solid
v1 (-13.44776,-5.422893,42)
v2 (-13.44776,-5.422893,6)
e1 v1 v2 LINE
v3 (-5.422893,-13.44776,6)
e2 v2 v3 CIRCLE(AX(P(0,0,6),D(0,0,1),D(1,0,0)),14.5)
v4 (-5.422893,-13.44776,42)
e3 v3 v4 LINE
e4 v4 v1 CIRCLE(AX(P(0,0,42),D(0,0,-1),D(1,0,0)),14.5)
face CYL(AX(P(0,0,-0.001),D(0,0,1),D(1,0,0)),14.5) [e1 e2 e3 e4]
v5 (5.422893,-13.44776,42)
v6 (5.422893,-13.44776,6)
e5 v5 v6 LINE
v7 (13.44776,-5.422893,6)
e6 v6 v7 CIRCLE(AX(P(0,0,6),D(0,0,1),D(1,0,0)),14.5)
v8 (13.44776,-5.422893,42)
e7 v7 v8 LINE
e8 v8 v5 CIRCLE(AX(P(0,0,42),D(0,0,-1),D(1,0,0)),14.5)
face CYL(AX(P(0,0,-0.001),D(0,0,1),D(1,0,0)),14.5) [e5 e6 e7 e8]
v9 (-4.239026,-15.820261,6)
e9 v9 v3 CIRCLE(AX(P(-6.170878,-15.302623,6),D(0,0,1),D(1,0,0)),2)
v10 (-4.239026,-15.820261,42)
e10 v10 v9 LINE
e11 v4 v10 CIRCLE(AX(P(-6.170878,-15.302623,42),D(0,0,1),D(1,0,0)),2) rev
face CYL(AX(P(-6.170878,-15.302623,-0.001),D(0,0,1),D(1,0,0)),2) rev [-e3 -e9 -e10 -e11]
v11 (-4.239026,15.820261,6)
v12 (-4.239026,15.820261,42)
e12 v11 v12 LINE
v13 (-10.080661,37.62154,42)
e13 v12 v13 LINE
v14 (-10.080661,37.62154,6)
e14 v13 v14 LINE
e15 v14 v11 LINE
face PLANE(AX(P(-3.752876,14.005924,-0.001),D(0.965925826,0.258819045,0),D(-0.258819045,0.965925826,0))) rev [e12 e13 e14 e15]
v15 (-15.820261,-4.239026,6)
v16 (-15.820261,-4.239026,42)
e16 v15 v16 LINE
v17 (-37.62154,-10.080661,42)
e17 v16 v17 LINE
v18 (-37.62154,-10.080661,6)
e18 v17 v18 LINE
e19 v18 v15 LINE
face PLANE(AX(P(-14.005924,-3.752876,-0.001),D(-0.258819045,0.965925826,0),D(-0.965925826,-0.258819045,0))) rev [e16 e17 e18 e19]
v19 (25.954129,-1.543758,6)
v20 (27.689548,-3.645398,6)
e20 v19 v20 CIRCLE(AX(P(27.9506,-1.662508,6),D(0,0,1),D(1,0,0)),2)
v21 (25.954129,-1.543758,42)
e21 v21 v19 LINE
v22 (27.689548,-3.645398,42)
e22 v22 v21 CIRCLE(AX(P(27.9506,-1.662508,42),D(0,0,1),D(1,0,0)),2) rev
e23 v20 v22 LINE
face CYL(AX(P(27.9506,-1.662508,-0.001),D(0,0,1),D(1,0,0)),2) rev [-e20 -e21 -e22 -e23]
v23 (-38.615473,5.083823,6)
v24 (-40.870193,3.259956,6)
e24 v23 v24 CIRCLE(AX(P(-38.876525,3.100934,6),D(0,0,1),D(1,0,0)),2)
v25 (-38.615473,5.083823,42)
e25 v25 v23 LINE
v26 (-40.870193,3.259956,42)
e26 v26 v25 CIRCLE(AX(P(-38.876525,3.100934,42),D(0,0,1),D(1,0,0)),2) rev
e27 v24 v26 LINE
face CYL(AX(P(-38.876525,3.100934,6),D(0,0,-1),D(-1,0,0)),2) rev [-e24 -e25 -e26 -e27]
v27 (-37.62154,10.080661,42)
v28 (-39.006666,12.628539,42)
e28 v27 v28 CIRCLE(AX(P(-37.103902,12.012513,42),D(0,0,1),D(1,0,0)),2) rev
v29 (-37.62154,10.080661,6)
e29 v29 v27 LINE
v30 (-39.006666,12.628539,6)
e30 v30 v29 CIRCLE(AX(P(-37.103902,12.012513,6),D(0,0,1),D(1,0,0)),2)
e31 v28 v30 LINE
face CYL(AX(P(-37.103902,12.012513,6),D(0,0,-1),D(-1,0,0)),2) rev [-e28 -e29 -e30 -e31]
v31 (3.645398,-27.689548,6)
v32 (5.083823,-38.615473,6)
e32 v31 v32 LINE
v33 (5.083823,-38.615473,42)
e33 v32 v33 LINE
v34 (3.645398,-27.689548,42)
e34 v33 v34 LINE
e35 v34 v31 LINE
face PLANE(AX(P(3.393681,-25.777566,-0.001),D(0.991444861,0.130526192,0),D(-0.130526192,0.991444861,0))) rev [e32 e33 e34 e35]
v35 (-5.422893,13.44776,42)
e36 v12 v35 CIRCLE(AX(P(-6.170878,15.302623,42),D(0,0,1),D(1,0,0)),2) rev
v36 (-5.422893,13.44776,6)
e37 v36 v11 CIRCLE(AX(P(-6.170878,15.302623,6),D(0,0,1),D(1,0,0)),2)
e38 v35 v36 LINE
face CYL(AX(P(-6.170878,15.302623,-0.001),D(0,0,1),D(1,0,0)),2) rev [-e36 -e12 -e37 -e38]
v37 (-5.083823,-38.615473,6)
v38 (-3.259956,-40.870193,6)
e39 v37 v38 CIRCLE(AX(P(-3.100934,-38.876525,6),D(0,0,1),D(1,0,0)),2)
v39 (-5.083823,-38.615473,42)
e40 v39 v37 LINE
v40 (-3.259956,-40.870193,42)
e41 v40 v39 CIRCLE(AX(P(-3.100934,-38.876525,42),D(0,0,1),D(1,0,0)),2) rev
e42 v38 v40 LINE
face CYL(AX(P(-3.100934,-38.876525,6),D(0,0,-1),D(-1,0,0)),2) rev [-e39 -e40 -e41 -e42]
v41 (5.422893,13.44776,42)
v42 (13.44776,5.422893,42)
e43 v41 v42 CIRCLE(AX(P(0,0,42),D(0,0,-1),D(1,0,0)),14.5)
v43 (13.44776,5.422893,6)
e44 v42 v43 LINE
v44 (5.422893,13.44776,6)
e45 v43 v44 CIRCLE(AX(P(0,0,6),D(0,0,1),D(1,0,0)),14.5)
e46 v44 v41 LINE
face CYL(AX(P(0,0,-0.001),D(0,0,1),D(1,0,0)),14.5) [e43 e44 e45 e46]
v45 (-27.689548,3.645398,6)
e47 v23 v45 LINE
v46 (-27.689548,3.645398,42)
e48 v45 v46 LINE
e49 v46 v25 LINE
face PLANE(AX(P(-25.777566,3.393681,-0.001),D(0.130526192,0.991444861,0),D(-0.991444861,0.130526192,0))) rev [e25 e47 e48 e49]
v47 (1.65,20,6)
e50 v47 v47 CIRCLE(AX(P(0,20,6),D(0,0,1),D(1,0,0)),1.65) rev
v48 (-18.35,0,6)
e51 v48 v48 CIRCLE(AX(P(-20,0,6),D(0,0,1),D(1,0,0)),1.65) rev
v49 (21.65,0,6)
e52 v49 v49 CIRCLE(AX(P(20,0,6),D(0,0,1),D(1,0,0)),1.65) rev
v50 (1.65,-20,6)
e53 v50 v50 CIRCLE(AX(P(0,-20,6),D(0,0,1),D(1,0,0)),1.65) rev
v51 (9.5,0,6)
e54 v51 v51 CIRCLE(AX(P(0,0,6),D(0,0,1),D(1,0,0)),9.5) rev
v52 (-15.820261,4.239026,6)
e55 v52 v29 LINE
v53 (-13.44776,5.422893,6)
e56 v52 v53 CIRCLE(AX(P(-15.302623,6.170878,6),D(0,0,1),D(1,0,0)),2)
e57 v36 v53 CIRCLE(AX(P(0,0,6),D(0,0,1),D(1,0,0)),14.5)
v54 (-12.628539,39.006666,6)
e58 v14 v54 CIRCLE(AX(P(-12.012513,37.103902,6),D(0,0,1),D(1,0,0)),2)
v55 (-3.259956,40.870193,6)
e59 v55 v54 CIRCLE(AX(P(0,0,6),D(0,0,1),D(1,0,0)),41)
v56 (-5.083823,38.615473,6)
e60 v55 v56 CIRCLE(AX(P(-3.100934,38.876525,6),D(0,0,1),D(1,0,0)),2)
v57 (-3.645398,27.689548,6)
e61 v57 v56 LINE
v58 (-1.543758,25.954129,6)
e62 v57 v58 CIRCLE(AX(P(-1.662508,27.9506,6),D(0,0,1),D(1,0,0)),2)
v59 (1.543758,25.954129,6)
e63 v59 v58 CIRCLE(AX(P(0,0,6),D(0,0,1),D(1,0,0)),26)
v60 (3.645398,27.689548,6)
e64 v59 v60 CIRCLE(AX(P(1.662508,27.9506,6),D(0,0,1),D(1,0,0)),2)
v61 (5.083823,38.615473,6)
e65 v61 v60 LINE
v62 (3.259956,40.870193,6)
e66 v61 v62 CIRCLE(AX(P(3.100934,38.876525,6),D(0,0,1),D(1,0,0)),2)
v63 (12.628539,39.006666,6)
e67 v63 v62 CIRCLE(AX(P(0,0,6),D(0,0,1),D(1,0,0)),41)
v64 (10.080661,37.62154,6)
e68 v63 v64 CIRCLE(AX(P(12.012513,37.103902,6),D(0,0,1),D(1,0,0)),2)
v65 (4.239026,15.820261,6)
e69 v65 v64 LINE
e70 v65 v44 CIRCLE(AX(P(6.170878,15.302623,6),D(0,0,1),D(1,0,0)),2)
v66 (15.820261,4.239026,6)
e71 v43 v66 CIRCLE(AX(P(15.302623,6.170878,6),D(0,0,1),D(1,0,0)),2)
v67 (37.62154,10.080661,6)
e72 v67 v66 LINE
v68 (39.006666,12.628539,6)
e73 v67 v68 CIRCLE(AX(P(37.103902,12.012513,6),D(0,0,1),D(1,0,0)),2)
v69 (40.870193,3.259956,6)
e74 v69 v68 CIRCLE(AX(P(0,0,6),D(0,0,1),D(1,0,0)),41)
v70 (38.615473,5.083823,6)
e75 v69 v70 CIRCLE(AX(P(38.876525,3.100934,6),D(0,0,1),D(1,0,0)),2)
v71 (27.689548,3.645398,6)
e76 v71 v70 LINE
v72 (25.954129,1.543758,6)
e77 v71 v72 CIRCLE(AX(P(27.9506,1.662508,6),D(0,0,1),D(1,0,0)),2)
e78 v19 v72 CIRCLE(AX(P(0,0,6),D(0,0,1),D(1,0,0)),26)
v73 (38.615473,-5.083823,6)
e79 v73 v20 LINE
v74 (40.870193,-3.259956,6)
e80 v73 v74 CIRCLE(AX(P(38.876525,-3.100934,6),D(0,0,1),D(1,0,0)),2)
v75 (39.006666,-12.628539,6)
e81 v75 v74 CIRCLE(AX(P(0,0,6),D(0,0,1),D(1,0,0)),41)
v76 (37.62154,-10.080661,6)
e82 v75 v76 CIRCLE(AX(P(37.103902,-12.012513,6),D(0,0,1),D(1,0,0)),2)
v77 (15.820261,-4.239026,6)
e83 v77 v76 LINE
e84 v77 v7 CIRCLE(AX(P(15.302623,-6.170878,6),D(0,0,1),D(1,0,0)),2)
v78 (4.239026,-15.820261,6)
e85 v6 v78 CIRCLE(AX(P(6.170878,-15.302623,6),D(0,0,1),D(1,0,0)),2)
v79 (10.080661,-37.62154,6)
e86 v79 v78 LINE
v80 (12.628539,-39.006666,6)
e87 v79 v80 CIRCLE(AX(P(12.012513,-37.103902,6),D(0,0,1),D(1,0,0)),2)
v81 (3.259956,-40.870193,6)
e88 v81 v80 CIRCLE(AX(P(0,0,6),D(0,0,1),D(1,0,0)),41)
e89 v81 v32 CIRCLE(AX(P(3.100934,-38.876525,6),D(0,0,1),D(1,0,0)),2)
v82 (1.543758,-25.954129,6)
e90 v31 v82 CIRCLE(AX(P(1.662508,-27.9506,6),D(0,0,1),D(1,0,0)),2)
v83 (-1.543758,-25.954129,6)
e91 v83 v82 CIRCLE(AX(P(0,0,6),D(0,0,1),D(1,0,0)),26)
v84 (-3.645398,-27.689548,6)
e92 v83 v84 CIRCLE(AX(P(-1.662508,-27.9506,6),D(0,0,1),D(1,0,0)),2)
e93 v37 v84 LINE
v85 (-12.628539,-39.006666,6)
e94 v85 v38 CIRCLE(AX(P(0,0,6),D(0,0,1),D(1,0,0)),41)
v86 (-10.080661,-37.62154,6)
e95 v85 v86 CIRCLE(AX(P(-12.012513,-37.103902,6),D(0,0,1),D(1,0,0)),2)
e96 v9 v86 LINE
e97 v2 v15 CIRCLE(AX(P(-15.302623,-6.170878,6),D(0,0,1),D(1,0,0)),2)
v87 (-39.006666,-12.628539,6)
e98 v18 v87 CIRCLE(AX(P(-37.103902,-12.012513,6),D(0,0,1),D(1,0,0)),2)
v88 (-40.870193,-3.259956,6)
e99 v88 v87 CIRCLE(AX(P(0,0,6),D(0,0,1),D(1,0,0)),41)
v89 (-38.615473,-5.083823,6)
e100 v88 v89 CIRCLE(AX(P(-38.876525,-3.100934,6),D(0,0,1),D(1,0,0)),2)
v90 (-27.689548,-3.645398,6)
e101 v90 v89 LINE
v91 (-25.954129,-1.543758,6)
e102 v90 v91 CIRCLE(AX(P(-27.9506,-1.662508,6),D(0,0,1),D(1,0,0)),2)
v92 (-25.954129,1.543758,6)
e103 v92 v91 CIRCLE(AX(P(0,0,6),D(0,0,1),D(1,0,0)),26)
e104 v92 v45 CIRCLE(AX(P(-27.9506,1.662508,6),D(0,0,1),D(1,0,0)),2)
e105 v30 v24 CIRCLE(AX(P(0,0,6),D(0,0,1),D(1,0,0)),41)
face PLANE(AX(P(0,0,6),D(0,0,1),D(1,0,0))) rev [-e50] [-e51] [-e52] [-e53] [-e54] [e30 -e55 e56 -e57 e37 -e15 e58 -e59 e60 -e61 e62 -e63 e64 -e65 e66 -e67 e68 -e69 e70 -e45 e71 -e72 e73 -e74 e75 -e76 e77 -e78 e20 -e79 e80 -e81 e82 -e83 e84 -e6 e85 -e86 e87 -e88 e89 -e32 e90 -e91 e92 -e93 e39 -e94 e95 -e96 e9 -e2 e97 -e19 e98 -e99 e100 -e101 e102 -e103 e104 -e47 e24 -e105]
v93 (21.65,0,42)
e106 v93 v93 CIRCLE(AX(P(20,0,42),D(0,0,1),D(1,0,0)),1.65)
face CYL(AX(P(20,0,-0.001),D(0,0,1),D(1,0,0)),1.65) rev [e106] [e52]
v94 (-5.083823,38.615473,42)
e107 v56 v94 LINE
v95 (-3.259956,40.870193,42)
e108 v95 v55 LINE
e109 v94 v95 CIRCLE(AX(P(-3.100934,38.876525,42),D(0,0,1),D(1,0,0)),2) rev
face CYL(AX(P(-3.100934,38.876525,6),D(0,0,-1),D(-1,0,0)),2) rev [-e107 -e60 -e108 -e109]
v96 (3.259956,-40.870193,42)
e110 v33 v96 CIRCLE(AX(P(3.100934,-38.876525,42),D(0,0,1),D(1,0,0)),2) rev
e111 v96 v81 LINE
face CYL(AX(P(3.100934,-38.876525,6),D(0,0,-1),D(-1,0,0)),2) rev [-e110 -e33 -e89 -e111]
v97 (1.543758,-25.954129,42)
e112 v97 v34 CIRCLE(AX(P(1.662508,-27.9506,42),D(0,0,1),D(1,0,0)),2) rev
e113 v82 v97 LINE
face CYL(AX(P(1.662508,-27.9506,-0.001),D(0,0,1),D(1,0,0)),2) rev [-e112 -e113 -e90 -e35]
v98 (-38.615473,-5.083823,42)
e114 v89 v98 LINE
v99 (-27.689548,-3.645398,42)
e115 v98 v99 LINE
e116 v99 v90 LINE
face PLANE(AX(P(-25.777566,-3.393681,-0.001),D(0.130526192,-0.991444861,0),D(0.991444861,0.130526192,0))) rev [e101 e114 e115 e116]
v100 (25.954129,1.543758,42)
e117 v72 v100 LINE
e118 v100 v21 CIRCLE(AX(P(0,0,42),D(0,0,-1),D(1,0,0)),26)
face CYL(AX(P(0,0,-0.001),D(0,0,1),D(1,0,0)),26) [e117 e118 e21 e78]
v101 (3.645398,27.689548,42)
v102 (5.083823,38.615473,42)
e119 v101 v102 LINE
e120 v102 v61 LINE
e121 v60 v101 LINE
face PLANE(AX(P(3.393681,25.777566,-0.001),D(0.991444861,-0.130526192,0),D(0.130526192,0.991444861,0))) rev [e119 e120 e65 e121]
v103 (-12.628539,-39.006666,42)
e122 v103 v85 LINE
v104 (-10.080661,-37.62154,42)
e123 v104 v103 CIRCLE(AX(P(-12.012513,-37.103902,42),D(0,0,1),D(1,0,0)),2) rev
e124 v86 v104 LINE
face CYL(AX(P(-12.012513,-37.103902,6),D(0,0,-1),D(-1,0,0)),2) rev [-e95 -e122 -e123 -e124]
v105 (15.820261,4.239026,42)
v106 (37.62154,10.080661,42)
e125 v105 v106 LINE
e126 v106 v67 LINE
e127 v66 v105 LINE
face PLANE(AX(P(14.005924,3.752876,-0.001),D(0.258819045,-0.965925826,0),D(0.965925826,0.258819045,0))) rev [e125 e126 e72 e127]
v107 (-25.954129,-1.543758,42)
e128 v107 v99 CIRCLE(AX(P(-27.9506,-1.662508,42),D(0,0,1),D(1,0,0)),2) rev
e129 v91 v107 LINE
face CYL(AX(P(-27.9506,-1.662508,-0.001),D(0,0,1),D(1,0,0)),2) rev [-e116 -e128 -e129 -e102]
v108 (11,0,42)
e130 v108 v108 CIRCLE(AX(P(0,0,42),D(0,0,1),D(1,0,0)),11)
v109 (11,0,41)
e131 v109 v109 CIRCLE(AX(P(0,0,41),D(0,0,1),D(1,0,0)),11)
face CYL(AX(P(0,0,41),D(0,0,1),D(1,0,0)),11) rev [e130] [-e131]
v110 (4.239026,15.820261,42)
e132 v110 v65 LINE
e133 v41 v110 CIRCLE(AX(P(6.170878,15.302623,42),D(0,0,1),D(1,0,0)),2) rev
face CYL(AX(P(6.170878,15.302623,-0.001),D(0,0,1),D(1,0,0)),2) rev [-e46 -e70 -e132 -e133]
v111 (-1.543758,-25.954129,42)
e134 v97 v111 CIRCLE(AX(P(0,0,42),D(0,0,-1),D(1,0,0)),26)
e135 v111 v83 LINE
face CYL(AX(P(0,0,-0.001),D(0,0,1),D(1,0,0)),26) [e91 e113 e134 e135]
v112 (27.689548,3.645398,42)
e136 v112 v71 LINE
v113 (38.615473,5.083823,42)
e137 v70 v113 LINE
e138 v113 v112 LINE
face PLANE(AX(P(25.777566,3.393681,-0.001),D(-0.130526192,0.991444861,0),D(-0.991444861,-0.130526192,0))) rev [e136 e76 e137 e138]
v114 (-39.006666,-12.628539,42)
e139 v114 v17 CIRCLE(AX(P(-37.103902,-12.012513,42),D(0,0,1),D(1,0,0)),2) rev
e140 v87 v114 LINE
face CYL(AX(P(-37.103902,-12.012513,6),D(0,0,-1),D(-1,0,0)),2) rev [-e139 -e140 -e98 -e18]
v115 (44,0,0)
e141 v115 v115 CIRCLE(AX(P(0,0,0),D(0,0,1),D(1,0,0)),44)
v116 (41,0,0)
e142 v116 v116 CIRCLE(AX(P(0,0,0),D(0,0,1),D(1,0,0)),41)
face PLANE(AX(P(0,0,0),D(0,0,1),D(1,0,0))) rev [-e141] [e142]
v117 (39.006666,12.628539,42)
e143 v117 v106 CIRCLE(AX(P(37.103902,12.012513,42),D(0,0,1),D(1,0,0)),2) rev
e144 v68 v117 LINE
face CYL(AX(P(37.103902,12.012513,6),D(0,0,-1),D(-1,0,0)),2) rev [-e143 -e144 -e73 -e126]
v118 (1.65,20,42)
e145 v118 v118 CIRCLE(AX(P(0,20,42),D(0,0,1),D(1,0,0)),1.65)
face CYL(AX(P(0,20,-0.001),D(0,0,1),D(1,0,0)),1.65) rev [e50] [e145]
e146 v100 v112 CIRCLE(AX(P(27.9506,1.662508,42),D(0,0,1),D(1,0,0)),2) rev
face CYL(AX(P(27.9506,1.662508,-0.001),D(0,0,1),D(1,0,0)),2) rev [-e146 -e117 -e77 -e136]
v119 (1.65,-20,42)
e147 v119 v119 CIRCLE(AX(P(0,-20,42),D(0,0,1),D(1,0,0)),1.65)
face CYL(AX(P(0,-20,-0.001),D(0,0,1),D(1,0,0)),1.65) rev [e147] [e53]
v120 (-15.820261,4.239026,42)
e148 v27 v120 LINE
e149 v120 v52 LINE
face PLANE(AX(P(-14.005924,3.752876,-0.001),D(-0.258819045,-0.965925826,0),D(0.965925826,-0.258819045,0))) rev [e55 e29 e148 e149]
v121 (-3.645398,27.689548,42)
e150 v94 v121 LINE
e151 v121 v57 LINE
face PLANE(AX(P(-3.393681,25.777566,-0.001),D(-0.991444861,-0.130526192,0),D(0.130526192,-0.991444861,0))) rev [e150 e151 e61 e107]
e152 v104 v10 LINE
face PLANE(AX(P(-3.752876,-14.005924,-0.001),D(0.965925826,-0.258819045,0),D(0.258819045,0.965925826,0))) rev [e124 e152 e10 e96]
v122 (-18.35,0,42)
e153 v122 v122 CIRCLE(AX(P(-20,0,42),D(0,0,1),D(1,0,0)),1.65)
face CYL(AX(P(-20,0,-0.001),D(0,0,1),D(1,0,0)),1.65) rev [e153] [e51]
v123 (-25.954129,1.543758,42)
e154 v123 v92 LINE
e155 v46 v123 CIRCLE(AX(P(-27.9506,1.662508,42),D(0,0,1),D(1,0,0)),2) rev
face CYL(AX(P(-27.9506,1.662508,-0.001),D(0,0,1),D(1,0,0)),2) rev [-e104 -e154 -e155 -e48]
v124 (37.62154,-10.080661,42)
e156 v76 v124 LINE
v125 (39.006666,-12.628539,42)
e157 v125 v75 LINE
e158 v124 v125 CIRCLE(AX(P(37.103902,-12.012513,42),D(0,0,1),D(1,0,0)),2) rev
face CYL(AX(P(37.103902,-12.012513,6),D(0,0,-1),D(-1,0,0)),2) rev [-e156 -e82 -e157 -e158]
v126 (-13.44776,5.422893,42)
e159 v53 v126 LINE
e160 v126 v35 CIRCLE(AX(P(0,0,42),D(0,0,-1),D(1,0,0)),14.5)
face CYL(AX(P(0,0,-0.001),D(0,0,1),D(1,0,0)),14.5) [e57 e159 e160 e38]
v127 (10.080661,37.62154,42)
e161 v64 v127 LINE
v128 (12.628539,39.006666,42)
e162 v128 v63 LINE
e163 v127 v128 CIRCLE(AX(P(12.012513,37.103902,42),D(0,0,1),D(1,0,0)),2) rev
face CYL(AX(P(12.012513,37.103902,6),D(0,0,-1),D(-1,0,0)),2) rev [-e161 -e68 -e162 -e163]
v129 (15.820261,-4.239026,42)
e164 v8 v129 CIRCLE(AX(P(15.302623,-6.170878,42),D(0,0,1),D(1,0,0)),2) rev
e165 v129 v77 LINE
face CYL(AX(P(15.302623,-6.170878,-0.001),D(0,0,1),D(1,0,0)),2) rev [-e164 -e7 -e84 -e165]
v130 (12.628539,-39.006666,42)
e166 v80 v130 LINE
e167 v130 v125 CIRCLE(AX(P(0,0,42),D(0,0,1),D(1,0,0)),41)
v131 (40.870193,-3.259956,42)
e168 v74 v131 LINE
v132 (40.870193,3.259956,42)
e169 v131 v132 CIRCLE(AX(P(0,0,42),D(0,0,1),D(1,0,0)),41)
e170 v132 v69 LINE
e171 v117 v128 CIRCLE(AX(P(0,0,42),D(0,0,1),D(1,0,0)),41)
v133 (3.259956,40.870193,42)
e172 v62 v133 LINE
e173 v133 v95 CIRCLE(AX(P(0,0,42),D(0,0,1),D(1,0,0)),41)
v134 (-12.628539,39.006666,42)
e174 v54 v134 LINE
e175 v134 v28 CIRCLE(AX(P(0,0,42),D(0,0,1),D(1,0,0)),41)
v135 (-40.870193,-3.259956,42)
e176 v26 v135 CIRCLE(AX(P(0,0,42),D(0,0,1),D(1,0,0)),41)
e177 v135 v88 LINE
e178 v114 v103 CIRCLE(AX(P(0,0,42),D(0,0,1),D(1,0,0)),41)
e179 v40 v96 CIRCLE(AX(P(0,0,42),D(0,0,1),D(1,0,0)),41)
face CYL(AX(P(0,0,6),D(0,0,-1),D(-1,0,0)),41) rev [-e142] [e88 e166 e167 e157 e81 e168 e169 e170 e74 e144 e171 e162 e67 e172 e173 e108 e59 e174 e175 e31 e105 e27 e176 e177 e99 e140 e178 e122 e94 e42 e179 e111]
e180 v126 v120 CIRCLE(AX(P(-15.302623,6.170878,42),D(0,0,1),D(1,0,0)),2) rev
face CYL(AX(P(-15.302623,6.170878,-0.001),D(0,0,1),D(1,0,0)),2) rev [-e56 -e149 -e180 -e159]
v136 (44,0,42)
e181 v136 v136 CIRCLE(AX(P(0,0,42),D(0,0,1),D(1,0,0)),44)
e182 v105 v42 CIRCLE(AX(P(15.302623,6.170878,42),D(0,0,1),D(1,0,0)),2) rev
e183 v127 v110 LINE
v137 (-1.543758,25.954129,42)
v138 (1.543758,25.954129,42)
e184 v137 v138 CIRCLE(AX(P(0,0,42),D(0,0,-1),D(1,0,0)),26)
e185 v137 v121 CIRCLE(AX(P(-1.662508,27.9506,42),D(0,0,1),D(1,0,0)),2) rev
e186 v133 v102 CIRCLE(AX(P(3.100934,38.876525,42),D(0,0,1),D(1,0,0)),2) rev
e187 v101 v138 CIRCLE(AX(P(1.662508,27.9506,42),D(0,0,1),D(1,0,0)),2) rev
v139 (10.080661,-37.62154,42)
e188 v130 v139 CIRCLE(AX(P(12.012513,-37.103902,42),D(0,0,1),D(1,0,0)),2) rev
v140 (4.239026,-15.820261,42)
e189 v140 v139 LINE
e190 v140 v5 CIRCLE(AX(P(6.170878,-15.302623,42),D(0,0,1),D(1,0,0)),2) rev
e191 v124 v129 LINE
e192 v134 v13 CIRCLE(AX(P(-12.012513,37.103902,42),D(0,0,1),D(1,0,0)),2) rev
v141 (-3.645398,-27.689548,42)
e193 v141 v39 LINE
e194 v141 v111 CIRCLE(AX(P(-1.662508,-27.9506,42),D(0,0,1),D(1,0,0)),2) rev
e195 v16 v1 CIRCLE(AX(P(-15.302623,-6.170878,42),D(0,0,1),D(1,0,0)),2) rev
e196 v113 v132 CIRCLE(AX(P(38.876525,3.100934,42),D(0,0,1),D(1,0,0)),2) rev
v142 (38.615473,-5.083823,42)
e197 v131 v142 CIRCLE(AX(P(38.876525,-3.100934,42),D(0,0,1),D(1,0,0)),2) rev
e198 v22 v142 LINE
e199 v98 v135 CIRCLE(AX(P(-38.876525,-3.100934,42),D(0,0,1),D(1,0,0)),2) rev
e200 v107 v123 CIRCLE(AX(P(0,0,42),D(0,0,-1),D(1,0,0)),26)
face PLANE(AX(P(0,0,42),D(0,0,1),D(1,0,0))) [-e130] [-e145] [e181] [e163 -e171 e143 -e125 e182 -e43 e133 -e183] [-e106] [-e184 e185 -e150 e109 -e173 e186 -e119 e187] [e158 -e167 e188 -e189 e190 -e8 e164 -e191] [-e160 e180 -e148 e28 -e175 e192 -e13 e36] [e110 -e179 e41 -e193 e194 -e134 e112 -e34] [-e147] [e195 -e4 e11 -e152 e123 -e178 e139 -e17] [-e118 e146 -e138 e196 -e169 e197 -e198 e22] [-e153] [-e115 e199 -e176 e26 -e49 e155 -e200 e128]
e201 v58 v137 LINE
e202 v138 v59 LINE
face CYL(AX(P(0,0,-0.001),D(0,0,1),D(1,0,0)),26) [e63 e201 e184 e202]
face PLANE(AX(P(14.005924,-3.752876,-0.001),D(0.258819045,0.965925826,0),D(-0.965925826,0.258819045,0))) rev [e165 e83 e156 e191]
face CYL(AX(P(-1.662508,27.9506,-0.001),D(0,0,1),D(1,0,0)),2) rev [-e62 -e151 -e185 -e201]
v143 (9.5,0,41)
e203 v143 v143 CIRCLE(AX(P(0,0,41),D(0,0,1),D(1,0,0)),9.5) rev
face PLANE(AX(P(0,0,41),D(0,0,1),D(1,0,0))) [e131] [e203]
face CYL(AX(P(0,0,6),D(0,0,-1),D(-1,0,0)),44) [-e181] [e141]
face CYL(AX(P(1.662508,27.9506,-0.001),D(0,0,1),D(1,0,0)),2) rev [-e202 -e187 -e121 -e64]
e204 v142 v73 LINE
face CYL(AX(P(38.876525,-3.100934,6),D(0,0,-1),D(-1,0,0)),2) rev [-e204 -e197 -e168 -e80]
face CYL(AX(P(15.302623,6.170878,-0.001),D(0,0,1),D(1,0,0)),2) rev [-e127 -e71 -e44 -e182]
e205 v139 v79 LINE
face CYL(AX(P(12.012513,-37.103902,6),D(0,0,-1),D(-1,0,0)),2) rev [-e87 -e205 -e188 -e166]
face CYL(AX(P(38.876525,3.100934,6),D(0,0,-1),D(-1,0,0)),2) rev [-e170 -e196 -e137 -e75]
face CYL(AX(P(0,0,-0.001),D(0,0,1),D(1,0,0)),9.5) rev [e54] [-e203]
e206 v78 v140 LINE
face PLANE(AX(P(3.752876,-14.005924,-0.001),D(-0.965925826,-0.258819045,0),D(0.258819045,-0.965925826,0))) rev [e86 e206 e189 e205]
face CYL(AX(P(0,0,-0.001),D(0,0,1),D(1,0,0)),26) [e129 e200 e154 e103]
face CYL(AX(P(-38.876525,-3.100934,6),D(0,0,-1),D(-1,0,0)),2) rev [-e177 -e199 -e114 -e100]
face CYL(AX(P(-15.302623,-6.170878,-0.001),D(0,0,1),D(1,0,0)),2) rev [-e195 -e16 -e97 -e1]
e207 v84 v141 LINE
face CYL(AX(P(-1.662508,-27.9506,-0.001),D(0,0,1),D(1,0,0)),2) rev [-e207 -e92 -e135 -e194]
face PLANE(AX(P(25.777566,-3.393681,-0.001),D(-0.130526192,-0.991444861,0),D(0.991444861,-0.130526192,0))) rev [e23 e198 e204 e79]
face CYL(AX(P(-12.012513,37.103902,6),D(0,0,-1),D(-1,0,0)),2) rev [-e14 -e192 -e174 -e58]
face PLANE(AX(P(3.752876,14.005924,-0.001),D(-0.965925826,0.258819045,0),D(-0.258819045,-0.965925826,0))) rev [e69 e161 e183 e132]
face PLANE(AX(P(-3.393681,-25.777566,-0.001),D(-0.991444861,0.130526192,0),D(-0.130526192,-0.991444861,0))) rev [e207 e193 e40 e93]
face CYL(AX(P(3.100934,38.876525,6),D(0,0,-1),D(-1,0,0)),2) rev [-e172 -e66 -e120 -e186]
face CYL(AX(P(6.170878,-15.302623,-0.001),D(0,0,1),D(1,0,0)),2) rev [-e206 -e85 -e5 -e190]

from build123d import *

# Parameters (mm, degrees)
SKETCH_1_R              = 44
SKETCH_1_R_2            = 41
EXTRUDE_1_DEPTH         = 6
SKETCH_2_R              = 44
EXTRUDE_2_DEPTH         = 36
SKETCH_3_R              = 44
SKETCH_3_R_2            = 39
EXTRUDE_3_DEPTH         = 10
CUT_EXTRUDE_START       = -36
CUT_EXTRUDE_1_OUTLINE_R = 9.5
CUT_EXTRUDE_1_DEPTH     = 36
FILLET_1_R              = 2
CUT_EXTRUDE_5_REACH     = 77.073
SKETCH_8_R              = 1.65
CUT_EXTRUDE_START_2     = -10
SKETCH_9_R              = 44
CUT_EXTRUDE_6_DEPTH     = 10
CUT_EXTRUDE_7_REACH     = 77.073
SKETCH_13_R             = 11
CUT_EXTRUDE_8_DEPTH     = 1
FILLET_2_R              = 2


# Read off the part's stored shape, not the designer's step: 切除-拉伸1
with BuildPart() as part:
    # 草图1 → 凸台-拉伸1 (new body)
    with BuildSketch(Plane.XY):
        Circle(SKETCH_1_R)
        Circle(SKETCH_1_R_2, mode=Mode.SUBTRACT)
    extrude(amount=EXTRUDE_1_DEPTH)

    # 草图2 → 凸台-拉伸2 (add)
    with BuildSketch(Plane.XY.offset(6)):
        Circle(SKETCH_2_R)
    extrude(amount=EXTRUDE_2_DEPTH)

    # 草图3 → 凸台-拉伸3 (add)
    with BuildSketch(Plane.XY.offset(42)):
        Circle(SKETCH_3_R)
        Circle(SKETCH_3_R_2, mode=Mode.SUBTRACT)
    extrude(amount=EXTRUDE_3_DEPTH)

    # 切除-拉伸1 outline → 切除-拉伸1 (cut)
    with BuildSketch(Plane.XY.offset(42).offset(CUT_EXTRUDE_START)):
        with BuildLine():
            Line((14.005924481, 3.752876154), (39.602958878, 10.611580849))
            ThreePointArc((39.602958878, 10.611580849), (28.991378029, 28.991378029), (10.611580849, 39.602958878))
            Line((10.611580849, 39.602958878), (3.752876154, 14.005924481))
            ThreePointArc((3.752876154, 14.005924481), (10.253048327, 10.253048327), (14.005924481, 3.752876154))
        make_face()
        with BuildLine():
            ThreePointArc((10.611580849, -39.602958878), (28.991378029, -28.991378029), (39.602958878, -10.611580849))
            Line((39.602958878, -10.611580849), (14.005924481, -3.752876154))
            ThreePointArc((14.005924481, -3.752876154), (10.253048327, -10.253048327), (3.752876154, -14.005924481))
            Line((3.752876154, -14.005924481), (10.611580849, -39.602958878))
        make_face()
        with BuildLine():
            Line((-3.752876154, 14.005924481), (-10.611580849, 39.602958878))
            ThreePointArc((-10.611580849, 39.602958878), (-28.991378029, 28.991378029), (-39.602958878, 10.611580849))
            Line((-39.602958878, 10.611580849), (-14.005924481, 3.752876154))
            ThreePointArc((-14.005924481, 3.752876154), (-10.253048327, 10.253048327), (-3.752876154, 14.005924481))
        make_face()
        with BuildLine():
            ThreePointArc((-39.602958878, -10.611580849), (-28.991378029, -28.991378029), (-10.611580849, -39.602958878))
            Line((-10.611580849, -39.602958878), (-3.752876154, -14.005924481))
            ThreePointArc((-3.752876154, -14.005924481), (-10.253048327, -10.253048327), (-14.005924481, -3.752876154))
            Line((-14.005924481, -3.752876154), (-39.602958878, -10.611580849))
        make_face()
        Circle(CUT_EXTRUDE_1_OUTLINE_R)
    extrude(amount=CUT_EXTRUDE_1_DEPTH, mode=Mode.SUBTRACT)

    # 圆角1
    # the kernel refuses this fillet: 2 mm, written as the material it adds along each edge
    with BuildSketch(Plane(origin=(-10.611580849, -39.602958878, 6), x_dir=(-0.9589694652555938, 0.2835093732267071, 0), z_dir=(0, 0, 1)), Plane(origin=(39.602958878, -10.611580849, 6), x_dir=(-0.2835093732267071, -0.9589694652555938, 0), z_dir=(0, 0, 1)), Plane(origin=(-39.602958878, 10.611580849, 6), x_dir=(0.2835093732267071, 0.9589694652555938, 0), z_dir=(0, 0, 1)), Plane(origin=(10.611580849, 39.602958878, 6), x_dir=(0.9589694652555938, -0.2835093732267071, 0), z_dir=(0, 0, 1))) as fillet_1_piece_1:
        with BuildLine():
            CenterArc((2.051957148, -1.999341997), FILLET_1_R, 88.530232757, 92.939534485)
            Line((0.052615152, -2.050640925), (0, 0))
            ThreePointArc((0, 0), (1.051628039, 0.013489067), (2.103256077, 0))
        make_face()
    extrude(amount=36)
    with BuildSketch(Plane(origin=(-39.602958878, -10.611580849, 6), x_dir=(0.2835093732267017, -0.9589694652555955, 0), z_dir=(0, 0, 1)), Plane(origin=(10.611580849, -39.602958878, 6), x_dir=(0.9589694652555955, 0.2835093732267017, 0), z_dir=(0, 0, 1)), Plane(origin=(-10.611580849, 39.602958878, 6), x_dir=(-0.9589694652555955, -0.2835093732267017, 0), z_dir=(0, 0, 1)), Plane(origin=(39.602958878, 10.611580849, 6), x_dir=(-0.2835093732267017, 0.9589694652555955, 0), z_dir=(0, 0, 1))) as fillet_1_piece_2:
        with BuildLine():
            CenterArc((2.051957148, 1.999341997), FILLET_1_R, 178.530232759, 92.939534485)
            Line((0.052615152, 2.050640925), (0, 0))
            ThreePointArc((0, 0), (1.051628039, -0.013489067), (2.103256077, 0))
        make_face()
    extrude(amount=36)
    with BuildSketch(Plane(origin=(-14.005924481, -3.752876154, 6), x_dir=(0.316990681826872, -0.9484286518420534, 0), z_dir=(0, 0, 1)), Plane(origin=(3.752876154, -14.005924481, 6), x_dir=(0.9484286518420534, 0.316990681826872, 0), z_dir=(0, 0, 1)), Plane(origin=(-3.752876154, 14.005924481, 6), x_dir=(-0.9484286518420534, -0.316990681826872, 0), z_dir=(0, 0, 1)), Plane(origin=(14.005924481, 3.752876154, 6), x_dir=(-0.316990681826872, 0.9484286518420534, 0), z_dir=(0, 0, 1))) as fillet_1_piece_3:
        with BuildLine():
            CenterArc((1.882260735, -1.99630991), FILLET_1_R, 93.481031345, 83.037937307)
            Line((-0.114049175, -1.874873733), (0, 0))
            ThreePointArc((0, 0), (0.880412279, -0.026753156), (1.760824558, 0))
        make_face()
    extrude(amount=36)
    with BuildSketch(Plane(origin=(-3.752876154, -14.005924481, 6), x_dir=(-0.2588190450916834, -0.9659258262919722, 0), z_dir=(0, 0, 1)), Plane(origin=(14.005924481, -3.752876154, 6), x_dir=(0.9659258262919722, -0.2588190450916834, 0), z_dir=(0, 0, 1)), Plane(origin=(-14.005924481, 3.752876154, 6), x_dir=(-0.9659258262919722, 0.2588190450916834, 0), z_dir=(0, 0, 1)), Plane(origin=(3.752876154, 14.005924481, 6), x_dir=(0.2588190450916834, 0.9659258262919722, 0), z_dir=(0, 0, 1))) as fillet_1_piece_4:
        with BuildLine():
            CenterArc((1.878339354, -2), FILLET_1_R, 90, 83.037937307)
            ThreePointArc((-0.106913901, -1.757575758), (-0.026753156, -0.880412279), (0, 0))
            Line((0, 0), (1.878339354, 0))
        make_face()
    extrude(amount=36)

    # 草图8 → 切除-拉伸5 (cut, up to next)
    with BuildSketch(Plane.XY.offset(42), mode=Mode.PRIVATE) as cut_extrude_5_sk1:
        with Locations((0, 20)):
            Circle(SKETCH_8_R)
    cut_extrude_5_tool1 = extrude(cut_extrude_5_sk1.sketch, amount=-CUT_EXTRUDE_5_REACH, mode=Mode.PRIVATE) & part.part
    # 草图8 → 切除-拉伸5 (cut, up to next)
    with BuildSketch(Plane.XY.offset(42), mode=Mode.PRIVATE) as cut_extrude_5_sk2:
        with Locations((20, 0)):
            Circle(SKETCH_8_R)
    cut_extrude_5_tool2 = extrude(cut_extrude_5_sk2.sketch, amount=-CUT_EXTRUDE_5_REACH, mode=Mode.PRIVATE) & part.part
    # 草图8 → 切除-拉伸5 (cut, up to next)
    with BuildSketch(Plane.XY.offset(42), mode=Mode.PRIVATE) as cut_extrude_5_sk3:
        with Locations((0, -20)):
            Circle(SKETCH_8_R)
    cut_extrude_5_tool3 = extrude(cut_extrude_5_sk3.sketch, amount=-CUT_EXTRUDE_5_REACH, mode=Mode.PRIVATE) & part.part
    # 草图8 → 切除-拉伸5 (cut, up to next)
    with BuildSketch(Plane.XY.offset(42), mode=Mode.PRIVATE) as cut_extrude_5_sk4:
        with Locations((-20, 0)):
            Circle(SKETCH_8_R)
    cut_extrude_5_tool4 = extrude(cut_extrude_5_sk4.sketch, amount=-CUT_EXTRUDE_5_REACH, mode=Mode.PRIVATE) & part.part
    add(cut_extrude_5_tool1.solids().sort_by_distance((0, 20, 42))[0], mode=Mode.SUBTRACT)
    add(cut_extrude_5_tool2.solids().sort_by_distance((20, 0, 42))[0], mode=Mode.SUBTRACT)
    add(cut_extrude_5_tool3.solids().sort_by_distance((0, -20, 42))[0], mode=Mode.SUBTRACT)
    add(cut_extrude_5_tool4.solids().sort_by_distance((-20, 0, 42))[0], mode=Mode.SUBTRACT)

    # 草图9 → 切除-拉伸6 (cut)
    with BuildSketch(Plane.XY.offset(52).offset(CUT_EXTRUDE_START_2)):
        Circle(SKETCH_9_R)
    extrude(amount=CUT_EXTRUDE_6_DEPTH, mode=Mode.SUBTRACT)

    # 草图12 → 切除-拉伸7 (cut, up to next)
    with BuildSketch(Plane.XY.offset(42), mode=Mode.PRIVATE) as cut_extrude_7_sk1:
        with BuildLine():
            Line((-3.393680998, 25.777566396), (-5.351573881, 40.649239316))
            ThreePointArc((-5.351573881, 40.649239316), (0, 41), (5.351573881, 40.649239316))
            Line((5.351573881, 40.649239316), (3.393680998, 25.777566396))
            ThreePointArc((3.393680998, 25.777566396), (0, 26), (-3.393680998, 25.777566396))
        make_face()
    cut_extrude_7_tool1 = extrude(cut_extrude_7_sk1.sketch, amount=-CUT_EXTRUDE_7_REACH, mode=Mode.PRIVATE) & part.part
    # 草图12 → 切除-拉伸7 (cut, up to next)
    with BuildSketch(Plane.XY.offset(42), mode=Mode.PRIVATE) as cut_extrude_7_sk2:
        with BuildLine():
            Line((25.777566396, 3.393680998), (40.649239316, 5.351573881))
            ThreePointArc((40.649239316, 5.351573881), (41, 0), (40.649239316, -5.351573881))
            Line((40.649239316, -5.351573881), (25.777566396, -3.393680998))
            ThreePointArc((25.777566396, -3.393680998), (26, 0), (25.777566396, 3.393680998))
        make_face()
    cut_extrude_7_tool2 = extrude(cut_extrude_7_sk2.sketch, amount=-CUT_EXTRUDE_7_REACH, mode=Mode.PRIVATE) & part.part
    # 草图12 → 切除-拉伸7 (cut, up to next)
    with BuildSketch(Plane.XY.offset(42), mode=Mode.PRIVATE) as cut_extrude_7_sk3:
        with BuildLine():
            Line((3.393680998, -25.777566396), (5.351573881, -40.649239316))
            ThreePointArc((5.351573881, -40.649239316), (0, -41), (-5.351573881, -40.649239316))
            Line((-5.351573881, -40.649239316), (-3.393680998, -25.777566396))
            ThreePointArc((-3.393680998, -25.777566396), (0, -26), (3.393680998, -25.777566396))
        make_face()
    cut_extrude_7_tool3 = extrude(cut_extrude_7_sk3.sketch, amount=-CUT_EXTRUDE_7_REACH, mode=Mode.PRIVATE) & part.part
    # 草图12 → 切除-拉伸7 (cut, up to next)
    with BuildSketch(Plane.XY.offset(42), mode=Mode.PRIVATE) as cut_extrude_7_sk4:
        with BuildLine():
            Line((-25.777566396, -3.393680998), (-40.649239316, -5.351573881))
            ThreePointArc((-40.649239316, -5.351573881), (-41, 0), (-40.649239316, 5.351573881))
            Line((-40.649239316, 5.351573881), (-25.777566396, 3.393680998))
            ThreePointArc((-25.777566396, 3.393680998), (-26, 0), (-25.777566396, -3.393680998))
        make_face()
    cut_extrude_7_tool4 = extrude(cut_extrude_7_sk4.sketch, amount=-CUT_EXTRUDE_7_REACH, mode=Mode.PRIVATE) & part.part
    add(cut_extrude_7_tool1.solids().sort_by_distance((0, 33.962517, 42))[0], mode=Mode.SUBTRACT)
    add(cut_extrude_7_tool2.solids().sort_by_distance((33.962517, 0, 42))[0], mode=Mode.SUBTRACT)
    add(cut_extrude_7_tool3.solids().sort_by_distance((0, -33.962517, 42))[0], mode=Mode.SUBTRACT)
    add(cut_extrude_7_tool4.solids().sort_by_distance((-33.962517, 0, 42))[0], mode=Mode.SUBTRACT)

    # 草图13 → 切除-拉伸8 (cut)
    with BuildSketch(Plane.XY.offset(42)):
        Circle(SKETCH_13_R)
    extrude(amount=-CUT_EXTRUDE_8_DEPTH, mode=Mode.SUBTRACT)

    # 圆角2
    # the kernel refuses this fillet: 2 mm, written as the material it adds along each edge
    with BuildSketch(Plane(origin=(-5.351573881, 40.649239316, 42), x_dir=(0.130526192220052, -0.9914448613738104, 0), z_dir=(0, 0, -1)), Plane(origin=(40.649239316, 5.351573881, 42), x_dir=(-0.9914448613738104, -0.13052619222005157, 0), z_dir=(0, 0, -1)), Plane(origin=(5.351573881, -40.649239316, 42), x_dir=(-0.13052619222005268, 0.9914448613738102, 0), z_dir=(0, 0, -1)), Plane(origin=(-40.649239316, -5.351573881, 42), x_dir=(0.9914448613738104, 0.13052619222005277, 0), z_dir=(0, 0, -1))) as fillet_2_piece_1:
        with BuildLine():
            CenterArc((2.051315812, -2), FILLET_2_R, 90, 92.939534486)
            ThreePointArc((0.053947392, -2.102564103), (0.013489067, -1.051628039), (0, 0))
            Line((0, 0), (2.051315812, 0))
        make_face()
    extrude(amount=36)
    with BuildSketch(Plane(origin=(5.351573881, 40.649239316, 42), x_dir=(-0.1305261922200523, -0.9914448613738103, 0), z_dir=(0, 0, -1)), Plane(origin=(40.649239316, -5.351573881, 42), x_dir=(-0.9914448613738103, 0.1305261922200523, 0), z_dir=(0, 0, -1)), Plane(origin=(-5.351573881, -40.649239316, 42), x_dir=(0.13052619222005238, 0.9914448613738104, 0), z_dir=(0, 0, -1)), Plane(origin=(-40.649239316, 5.351573881, 42), x_dir=(0.9914448613738103, -0.13052619222005185, 0), z_dir=(0, 0, -1))) as fillet_2_piece_2:
        with BuildLine():
            CenterArc((2.051315812, 2), FILLET_2_R, 177.060465514, 92.939534486)
            ThreePointArc((0.053947392, 2.102564103), (0.013489067, 1.051628039), (0, 0))
            Line((0, 0), (2.051315812, 0))
        make_face()
    extrude(amount=36)
    with BuildSketch(Plane(origin=(3.393680998, 25.777566396, 42), x_dir=(0.1305261922200518, 0.9914448613738104, 0), z_dir=(0, 0, -1)), Plane(origin=(25.777566396, -3.393680998, 42), x_dir=(0.9914448613738103, -0.130526192220052, 0), z_dir=(0, 0, -1)), Plane(origin=(-3.393680998, -25.777566396, 42), x_dir=(-0.13052619222005202, -0.9914448613738104, 0), z_dir=(0, 0, -1)), Plane(origin=(-25.777566396, 3.393680998, 42), x_dir=(-0.9914448613738104, 0.13052619222005157, 0), z_dir=(0, 0, -1))) as fillet_2_piece_3:
        with BuildLine():
            CenterArc((1.928480088, -2), FILLET_2_R, 90, 85.903956242)
            ThreePointArc((-0.066411347, -1.857142857), (-0.016608141, -0.929164956), (0, 0))
            Line((0, 0), (1.928480088, 0))
        make_face()
    extrude(amount=36)
    with BuildSketch(Plane(origin=(-3.393680998, 25.777566396, 42), x_dir=(0.9954761808852897, 0.09501143768009296, 0), z_dir=(0, 0, -1)), Plane(origin=(25.777566396, 3.393680998, 42), x_dir=(0.09501143768008931, -0.99547618088529, 0), z_dir=(0, 0, -1)), Plane(origin=(3.393680998, -25.777566396, 42), x_dir=(-0.99547618088529, -0.09501143768008934, 0), z_dir=(0, 0, -1)), Plane(origin=(-25.777566396, -3.393680998, 42), x_dir=(-0.09501143768009106, 0.9954761808852899, 0), z_dir=(0, 0, -1))) as fillet_2_piece_4:
        with BuildLine():
            CenterArc((1.929804139, -1.998722451), FILLET_2_R, 92.048021879, 85.903956242)
            Line((-0.068918312, -1.927248223), (0, 0))
            ThreePointArc((0, 0), (0.929164956, -0.016608141), (1.858329911, 0))
        make_face()
    extrude(amount=36)


solid = part.part
